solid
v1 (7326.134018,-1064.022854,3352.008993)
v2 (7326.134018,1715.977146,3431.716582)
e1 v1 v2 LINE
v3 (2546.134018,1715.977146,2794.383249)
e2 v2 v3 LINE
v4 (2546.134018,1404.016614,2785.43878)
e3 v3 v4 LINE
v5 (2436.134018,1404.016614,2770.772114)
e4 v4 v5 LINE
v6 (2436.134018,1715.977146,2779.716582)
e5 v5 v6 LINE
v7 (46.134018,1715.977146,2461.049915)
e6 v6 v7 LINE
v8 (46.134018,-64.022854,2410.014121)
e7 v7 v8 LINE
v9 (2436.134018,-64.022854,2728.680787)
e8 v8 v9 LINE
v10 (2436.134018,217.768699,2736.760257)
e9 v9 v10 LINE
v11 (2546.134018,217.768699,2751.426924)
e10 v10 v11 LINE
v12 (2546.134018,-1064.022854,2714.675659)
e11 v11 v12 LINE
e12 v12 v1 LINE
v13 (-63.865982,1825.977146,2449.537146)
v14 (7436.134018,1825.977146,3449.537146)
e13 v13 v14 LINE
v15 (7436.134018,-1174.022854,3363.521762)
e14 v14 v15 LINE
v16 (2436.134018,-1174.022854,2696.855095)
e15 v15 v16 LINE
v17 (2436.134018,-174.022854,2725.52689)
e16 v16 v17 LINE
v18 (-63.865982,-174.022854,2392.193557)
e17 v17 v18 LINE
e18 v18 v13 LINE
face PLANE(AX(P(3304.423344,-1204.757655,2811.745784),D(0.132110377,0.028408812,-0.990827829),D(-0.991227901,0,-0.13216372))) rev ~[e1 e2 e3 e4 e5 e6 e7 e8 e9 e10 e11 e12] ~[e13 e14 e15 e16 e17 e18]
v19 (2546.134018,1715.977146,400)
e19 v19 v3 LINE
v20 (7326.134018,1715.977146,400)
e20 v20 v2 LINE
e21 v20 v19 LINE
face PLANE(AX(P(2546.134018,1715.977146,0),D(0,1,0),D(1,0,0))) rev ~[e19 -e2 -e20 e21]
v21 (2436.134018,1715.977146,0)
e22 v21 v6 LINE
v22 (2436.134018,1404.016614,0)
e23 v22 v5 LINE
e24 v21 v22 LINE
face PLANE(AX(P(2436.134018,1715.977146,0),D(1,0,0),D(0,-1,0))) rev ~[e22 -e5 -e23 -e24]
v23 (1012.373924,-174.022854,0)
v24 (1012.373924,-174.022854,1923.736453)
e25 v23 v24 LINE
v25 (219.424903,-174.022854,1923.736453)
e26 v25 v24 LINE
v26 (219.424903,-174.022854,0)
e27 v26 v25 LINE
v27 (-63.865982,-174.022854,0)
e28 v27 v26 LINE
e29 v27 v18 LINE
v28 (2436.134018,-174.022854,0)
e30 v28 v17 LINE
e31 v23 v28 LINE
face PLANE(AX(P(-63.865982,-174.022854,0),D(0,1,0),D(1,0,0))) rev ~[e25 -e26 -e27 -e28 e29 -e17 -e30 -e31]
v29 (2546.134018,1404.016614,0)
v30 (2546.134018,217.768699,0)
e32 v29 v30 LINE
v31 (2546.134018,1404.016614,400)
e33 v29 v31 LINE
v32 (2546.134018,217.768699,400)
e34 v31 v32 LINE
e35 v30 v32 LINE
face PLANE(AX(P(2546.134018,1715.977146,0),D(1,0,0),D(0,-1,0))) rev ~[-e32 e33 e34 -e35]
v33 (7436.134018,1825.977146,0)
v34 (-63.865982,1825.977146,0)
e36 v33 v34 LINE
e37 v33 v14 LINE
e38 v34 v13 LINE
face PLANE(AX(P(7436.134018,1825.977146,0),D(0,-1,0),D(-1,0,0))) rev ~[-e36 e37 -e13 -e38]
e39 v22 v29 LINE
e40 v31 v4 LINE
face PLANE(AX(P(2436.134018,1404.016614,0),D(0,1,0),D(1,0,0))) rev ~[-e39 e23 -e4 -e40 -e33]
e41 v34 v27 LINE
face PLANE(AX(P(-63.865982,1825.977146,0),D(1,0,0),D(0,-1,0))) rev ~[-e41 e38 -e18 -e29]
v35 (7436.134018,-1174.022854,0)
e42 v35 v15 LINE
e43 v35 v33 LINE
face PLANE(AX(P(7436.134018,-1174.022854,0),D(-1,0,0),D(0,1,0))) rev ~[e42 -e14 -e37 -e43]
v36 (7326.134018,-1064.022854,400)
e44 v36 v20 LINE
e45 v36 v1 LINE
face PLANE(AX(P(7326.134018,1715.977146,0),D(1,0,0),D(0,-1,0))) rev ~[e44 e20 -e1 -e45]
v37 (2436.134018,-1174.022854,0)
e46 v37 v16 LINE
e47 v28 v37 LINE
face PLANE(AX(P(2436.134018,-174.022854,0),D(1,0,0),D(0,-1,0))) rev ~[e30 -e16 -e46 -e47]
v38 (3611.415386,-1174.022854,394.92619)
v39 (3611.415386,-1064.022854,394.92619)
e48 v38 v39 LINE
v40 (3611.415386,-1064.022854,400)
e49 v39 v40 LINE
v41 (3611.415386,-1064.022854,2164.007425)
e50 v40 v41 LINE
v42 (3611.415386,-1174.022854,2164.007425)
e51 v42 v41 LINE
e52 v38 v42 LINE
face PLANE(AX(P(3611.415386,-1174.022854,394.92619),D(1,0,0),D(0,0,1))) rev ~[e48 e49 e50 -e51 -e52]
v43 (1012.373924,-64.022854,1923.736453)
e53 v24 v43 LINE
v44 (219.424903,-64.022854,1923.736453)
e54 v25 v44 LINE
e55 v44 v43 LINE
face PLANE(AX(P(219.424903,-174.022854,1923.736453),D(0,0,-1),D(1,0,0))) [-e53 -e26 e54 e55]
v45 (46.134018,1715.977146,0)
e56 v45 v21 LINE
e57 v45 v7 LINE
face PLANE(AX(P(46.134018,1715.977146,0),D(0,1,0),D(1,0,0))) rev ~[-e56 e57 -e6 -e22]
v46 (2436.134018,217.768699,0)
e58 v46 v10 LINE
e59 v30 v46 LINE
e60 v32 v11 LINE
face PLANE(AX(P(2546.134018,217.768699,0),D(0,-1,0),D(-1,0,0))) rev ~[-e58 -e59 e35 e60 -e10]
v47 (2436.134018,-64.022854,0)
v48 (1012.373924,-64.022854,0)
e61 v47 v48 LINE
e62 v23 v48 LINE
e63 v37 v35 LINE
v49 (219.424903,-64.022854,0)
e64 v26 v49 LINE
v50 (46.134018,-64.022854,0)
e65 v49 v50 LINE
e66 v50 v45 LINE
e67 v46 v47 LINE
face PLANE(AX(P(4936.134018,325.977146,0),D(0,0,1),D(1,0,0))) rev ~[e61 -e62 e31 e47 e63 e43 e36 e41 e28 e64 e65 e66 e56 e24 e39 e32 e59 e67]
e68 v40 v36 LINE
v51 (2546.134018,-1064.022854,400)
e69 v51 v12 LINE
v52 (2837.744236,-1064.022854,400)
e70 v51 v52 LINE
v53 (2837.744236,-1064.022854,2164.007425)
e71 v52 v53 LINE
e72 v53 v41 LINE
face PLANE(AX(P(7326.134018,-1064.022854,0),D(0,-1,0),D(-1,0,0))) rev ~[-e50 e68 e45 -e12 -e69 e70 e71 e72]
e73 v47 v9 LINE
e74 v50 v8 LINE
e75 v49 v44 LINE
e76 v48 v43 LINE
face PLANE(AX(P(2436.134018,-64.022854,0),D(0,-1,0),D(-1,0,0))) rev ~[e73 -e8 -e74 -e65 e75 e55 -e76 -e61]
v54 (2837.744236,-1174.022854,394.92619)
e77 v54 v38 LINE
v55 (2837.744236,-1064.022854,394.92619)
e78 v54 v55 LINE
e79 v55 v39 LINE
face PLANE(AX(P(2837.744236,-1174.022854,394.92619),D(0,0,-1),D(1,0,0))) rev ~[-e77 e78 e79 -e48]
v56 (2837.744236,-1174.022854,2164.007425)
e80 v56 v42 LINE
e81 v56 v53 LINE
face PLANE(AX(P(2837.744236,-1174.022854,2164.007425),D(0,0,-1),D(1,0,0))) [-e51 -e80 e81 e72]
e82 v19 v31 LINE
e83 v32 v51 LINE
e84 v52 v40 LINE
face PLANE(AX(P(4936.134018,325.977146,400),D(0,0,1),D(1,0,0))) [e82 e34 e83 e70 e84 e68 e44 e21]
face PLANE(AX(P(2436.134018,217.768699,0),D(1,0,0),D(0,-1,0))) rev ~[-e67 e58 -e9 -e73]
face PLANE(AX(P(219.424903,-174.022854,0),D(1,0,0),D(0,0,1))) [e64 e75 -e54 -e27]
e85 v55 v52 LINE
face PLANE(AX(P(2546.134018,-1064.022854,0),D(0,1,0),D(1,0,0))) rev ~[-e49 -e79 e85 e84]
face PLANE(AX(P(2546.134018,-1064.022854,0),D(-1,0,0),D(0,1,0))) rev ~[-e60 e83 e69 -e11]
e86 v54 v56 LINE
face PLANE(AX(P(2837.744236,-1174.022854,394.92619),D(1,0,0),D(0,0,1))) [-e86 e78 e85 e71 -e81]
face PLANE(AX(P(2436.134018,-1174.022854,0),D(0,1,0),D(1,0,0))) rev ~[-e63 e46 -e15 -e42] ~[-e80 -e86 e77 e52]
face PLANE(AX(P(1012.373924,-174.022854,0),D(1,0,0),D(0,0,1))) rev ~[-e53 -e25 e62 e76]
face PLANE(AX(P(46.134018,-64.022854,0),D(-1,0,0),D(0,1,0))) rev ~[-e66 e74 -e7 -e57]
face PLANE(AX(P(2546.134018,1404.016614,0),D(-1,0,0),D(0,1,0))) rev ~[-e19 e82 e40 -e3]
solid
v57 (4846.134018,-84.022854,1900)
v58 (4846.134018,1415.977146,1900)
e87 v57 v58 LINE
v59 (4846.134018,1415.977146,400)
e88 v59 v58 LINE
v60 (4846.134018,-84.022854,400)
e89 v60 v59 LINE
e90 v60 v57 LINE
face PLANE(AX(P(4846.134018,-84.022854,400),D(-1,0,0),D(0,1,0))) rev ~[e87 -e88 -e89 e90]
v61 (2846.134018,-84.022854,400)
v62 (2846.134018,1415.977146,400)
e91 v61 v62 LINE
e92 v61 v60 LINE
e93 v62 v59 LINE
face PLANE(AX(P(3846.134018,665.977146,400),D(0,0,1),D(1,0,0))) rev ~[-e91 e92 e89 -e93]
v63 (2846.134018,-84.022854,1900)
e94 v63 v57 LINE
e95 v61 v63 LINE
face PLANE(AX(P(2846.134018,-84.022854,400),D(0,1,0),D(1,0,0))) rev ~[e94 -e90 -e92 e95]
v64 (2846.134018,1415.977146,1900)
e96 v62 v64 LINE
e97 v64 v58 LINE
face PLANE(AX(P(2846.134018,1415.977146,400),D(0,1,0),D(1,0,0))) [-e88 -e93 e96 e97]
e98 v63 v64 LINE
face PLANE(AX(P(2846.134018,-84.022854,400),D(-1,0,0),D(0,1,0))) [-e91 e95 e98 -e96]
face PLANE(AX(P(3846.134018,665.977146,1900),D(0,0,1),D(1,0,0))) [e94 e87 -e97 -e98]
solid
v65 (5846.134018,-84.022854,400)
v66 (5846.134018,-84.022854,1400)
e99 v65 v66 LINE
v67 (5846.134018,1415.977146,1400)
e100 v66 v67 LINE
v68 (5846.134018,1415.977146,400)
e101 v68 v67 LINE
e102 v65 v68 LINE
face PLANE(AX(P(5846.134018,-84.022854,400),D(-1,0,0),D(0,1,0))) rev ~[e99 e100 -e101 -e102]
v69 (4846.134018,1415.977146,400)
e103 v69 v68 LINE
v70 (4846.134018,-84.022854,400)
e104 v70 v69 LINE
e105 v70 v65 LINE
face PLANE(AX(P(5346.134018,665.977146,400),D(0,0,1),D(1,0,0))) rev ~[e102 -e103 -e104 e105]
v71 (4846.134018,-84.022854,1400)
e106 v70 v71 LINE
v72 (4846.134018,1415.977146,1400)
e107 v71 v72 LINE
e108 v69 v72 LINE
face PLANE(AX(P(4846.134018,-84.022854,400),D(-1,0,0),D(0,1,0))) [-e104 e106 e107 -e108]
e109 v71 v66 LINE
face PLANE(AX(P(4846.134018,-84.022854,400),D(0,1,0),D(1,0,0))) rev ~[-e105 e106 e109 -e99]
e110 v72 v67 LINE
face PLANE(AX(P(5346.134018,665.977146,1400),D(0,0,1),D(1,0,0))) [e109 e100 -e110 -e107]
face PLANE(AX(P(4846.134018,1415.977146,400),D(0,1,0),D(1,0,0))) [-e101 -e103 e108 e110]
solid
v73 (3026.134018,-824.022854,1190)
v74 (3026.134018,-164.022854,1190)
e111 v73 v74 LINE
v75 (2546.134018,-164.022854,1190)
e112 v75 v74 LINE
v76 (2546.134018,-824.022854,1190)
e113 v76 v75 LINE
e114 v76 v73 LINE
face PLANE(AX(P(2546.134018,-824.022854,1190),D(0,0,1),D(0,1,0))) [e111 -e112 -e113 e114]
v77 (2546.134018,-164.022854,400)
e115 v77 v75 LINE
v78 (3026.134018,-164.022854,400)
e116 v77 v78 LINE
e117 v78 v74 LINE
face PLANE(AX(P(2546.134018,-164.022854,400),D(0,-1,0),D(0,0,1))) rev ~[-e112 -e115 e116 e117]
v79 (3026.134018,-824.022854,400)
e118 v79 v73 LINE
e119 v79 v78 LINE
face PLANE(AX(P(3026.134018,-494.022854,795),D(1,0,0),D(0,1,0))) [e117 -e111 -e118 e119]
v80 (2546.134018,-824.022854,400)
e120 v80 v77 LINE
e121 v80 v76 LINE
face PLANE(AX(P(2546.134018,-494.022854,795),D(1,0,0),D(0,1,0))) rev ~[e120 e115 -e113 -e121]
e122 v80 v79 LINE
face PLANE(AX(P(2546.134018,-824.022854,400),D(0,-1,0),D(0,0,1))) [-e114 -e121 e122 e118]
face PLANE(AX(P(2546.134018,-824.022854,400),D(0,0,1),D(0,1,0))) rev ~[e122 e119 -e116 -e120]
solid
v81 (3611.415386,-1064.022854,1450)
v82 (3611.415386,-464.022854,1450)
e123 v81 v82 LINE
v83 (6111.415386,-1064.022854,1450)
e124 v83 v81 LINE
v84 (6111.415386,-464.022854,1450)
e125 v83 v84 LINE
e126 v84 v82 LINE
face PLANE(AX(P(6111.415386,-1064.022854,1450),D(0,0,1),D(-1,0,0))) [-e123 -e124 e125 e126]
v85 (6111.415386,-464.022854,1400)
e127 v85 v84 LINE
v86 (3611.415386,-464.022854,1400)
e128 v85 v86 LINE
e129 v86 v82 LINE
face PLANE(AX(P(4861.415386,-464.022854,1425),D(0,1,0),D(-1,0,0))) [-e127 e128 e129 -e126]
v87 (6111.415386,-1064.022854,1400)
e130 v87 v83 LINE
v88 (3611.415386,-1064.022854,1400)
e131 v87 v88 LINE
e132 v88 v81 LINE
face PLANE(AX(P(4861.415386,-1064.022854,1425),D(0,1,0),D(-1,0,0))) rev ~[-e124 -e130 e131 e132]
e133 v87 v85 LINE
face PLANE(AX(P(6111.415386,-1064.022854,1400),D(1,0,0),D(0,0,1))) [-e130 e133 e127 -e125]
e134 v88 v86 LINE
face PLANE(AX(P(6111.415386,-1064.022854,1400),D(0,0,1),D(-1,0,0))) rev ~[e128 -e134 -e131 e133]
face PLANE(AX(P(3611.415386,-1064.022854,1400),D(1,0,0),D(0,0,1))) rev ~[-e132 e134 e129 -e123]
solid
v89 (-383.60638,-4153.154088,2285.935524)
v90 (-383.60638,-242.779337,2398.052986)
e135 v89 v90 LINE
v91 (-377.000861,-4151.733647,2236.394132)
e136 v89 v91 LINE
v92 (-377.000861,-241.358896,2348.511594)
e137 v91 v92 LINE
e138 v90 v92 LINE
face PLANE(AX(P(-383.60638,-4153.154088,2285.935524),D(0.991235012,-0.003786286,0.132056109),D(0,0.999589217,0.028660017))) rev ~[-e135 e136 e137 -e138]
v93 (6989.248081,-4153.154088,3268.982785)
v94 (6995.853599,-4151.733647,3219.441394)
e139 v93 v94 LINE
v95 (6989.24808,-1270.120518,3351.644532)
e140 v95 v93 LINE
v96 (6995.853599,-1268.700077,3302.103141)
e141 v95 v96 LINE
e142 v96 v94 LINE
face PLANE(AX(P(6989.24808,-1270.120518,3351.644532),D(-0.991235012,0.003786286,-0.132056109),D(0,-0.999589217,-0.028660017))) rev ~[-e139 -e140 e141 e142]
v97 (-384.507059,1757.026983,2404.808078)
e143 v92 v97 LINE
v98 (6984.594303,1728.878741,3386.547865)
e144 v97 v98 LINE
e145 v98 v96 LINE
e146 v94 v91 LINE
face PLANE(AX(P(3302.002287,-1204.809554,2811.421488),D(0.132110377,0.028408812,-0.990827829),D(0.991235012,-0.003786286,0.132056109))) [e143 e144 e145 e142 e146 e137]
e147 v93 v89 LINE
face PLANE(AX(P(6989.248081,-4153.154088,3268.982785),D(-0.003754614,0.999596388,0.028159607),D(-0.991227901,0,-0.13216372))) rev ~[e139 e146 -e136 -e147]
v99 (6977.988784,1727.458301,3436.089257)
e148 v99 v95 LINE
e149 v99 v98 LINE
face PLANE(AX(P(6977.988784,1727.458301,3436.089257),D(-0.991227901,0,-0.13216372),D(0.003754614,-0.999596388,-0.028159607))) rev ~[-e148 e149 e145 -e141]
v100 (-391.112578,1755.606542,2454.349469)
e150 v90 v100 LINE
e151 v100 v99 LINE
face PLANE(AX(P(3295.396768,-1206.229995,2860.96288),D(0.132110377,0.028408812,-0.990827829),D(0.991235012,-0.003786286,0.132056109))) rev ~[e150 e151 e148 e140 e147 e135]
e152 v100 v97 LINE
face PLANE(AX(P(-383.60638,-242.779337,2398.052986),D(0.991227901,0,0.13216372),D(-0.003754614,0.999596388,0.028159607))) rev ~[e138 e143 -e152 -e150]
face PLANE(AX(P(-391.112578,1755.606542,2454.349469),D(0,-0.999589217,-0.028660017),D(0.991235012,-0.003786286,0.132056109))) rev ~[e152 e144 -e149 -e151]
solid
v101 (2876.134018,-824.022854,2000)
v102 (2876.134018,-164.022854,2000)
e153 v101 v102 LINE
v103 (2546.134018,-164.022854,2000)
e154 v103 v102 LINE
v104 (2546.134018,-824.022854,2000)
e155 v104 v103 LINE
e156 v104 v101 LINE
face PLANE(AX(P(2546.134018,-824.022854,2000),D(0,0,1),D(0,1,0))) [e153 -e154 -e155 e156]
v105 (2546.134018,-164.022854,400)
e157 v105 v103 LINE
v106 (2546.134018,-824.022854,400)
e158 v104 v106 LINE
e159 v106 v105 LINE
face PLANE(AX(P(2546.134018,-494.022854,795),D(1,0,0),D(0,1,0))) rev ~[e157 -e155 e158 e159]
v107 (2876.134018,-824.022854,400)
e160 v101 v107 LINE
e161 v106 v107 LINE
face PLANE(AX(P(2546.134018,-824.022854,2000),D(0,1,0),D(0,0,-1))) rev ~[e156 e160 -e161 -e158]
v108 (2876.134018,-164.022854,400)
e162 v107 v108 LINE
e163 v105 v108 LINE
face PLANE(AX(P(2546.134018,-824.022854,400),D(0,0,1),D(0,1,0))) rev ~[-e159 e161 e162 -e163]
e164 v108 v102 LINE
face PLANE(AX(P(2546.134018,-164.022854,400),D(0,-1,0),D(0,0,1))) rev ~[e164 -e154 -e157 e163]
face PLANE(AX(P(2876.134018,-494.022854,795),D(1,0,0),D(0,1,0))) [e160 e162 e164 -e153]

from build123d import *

# Parameters (mm, degrees)
F7_DEPTH  = 50
F8_REACH  = 9267.0421515008
F9_W      = 792.9490208626
F9_H      = 1923.7364530563
F10_DEPTH = 110
F11_W     = 773.6711502075
F11_H     = 1769.0812349319
F12_DEPTH = 110
F13_DEPTH = 400
F14_W     = 660
F14_H     = 790
F15_DEPTH = 480
F14_H_2   = 810
F16_DEPTH = 330
F17_W     = 2000
F17_H     = 1500
F18_DEPTH = 1500
F17_W_2   = 1000
F19_DEPTH = 1000
F20_W     = 2500
F20_H     = 50
F21_DEPTH = 600


# Not quite as in the source:
# - a feature names something its author has since deleted; it is built from what else it names


with BuildPart() as f7:
    # F6 (on 3pt) → F7 (new body)
    with BuildSketch(Plane(origin=(-321.5081857629, -69.1366251757, 2411.3113932214), x_dir=(0.9912350116, -0.0037862856, 0.1320561086), z_dir=(0.1321103773, 0.0284088121, -0.9908278295))):
        Polygon((-62.647297173, 173.9513684009), (-70.2198684375, -1825.2270662935), (2407.8676605606, -1825.2270662935), (7364.0427185569, -1825.2270662935), (7375.4015754536, 1173.5405857481), (7375.4015754536, 4057.758942678), (-62.647297173, 4085.9330937089), align=None)
    extrude(amount=F7_DEPTH)


with BuildPart() as f8:
    f8_end = Plane(origin=(3304.4233440469, -1204.757655027, 2811.745783625), x_dir=(-0.9912279007, 0, -0.1321637201), z_dir=(0.1321103773, 0.0284088121, -0.9908278295))
    # F0 (on Top) → F8 (new body, up to a plane its end follows)
    with BuildSketch(Plane.XY):
        Polygon((7436.1340180039, 1825.9771460295), (2436.1340180039, 1825.9771460295), (2436.1340180039, 1715.9771460295), (2436.1340180039, 1404.0166139603), (2546.1340180039, 1404.0166139603), (2546.1340180039, 1715.9771460295), (7326.1340180039, 1715.9771460295), (7326.1340180039, -1064.0228539705), (2546.1340180039, -1064.0228539705), (2546.1340180039, 217.7686989307), (2436.1340180039, 217.7686989307), (2436.1340180039, -64.0228539705), (2436.1340180039, -174.0228539705), (2436.1340180039, -1174.0228539705), (7436.1340180039, -1174.0228539705), align=None)
        Polygon((2436.1340180039, 1825.9771460295), (-63.8659819961, 1825.9771460295), (-63.8659819961, -174.0228539705), (2436.1340180039, -174.0228539705), (2436.1340180039, -64.0228539705), (46.1340180039, -64.0228539705), (46.1340180039, 1715.9771460295), (2436.1340180039, 1715.9771460295), align=None)
    f8_long = extrude(amount=F8_REACH, mode=Mode.PRIVATE)
    add(split(f8_long, bisect_by=f8_end, keep=Keep.TOP, mode=Mode.PRIVATE))

    # F9 (on face) → F10 (cut, through all)
    with BuildSketch(Plane.XZ.offset(174.0228539705)):
        with Locations((615.8994138241, 961.8682265282)):
            Rectangle(F9_W, F9_H)
    extrude(amount=-F10_DEPTH, mode=Mode.SUBTRACT)

    # F11 (on face) → F12 (cut, through all)
    with BuildSketch(Plane.XZ.offset(1174.0228539705)):
        with Locations((3224.5798110962, 1279.4668078423)):
            Rectangle(F11_W, F11_H)
    extrude(amount=-F12_DEPTH, mode=Mode.SUBTRACT)

    # F0 (on Top) → F13 (join)
    with BuildSketch(Plane.XY):
        Polygon((2546.1340180039, 1715.9771460295), (2546.1340180039, 1404.0166139603), (2546.1340180039, 217.7686989307), (2546.1340180039, -1064.0228539705), (7326.1340180039, -1064.0228539705), (7326.1340180039, 1715.9771460295), align=None)
    extrude(amount=F13_DEPTH)


with BuildPart() as f15:
    # F14 (on face) → F15 (new body)
    with BuildSketch(Plane.YZ.offset(2546.1340180039)):
        with Locations((-494.0228539705, 795)):
            Rectangle(F14_W, F14_H)
    extrude(amount=F15_DEPTH)


with BuildPart() as f16:
    # F14 (on face) → F16 (new body)
    with BuildSketch(Plane.YZ.offset(2546.1340180039)):
        with Locations((-494.0228539705, 795)):
            Rectangle(F14_W, F14_H)
        with Locations((-494.0228539705, 1595)):
            Rectangle(F14_W, F14_H_2)
    extrude(amount=F16_DEPTH)


with BuildPart() as f18:
    # F17 (on face) → F18 (new body)
    with BuildSketch(Plane.XY.offset(400)):
        with Locations((3846.1340180039, 665.9771460295)):
            Rectangle(F17_W, F17_H)
    extrude(amount=F18_DEPTH)


with BuildPart() as f19:
    # F17 (on face) → F19 (new body)
    with BuildSketch(Plane.XY.offset(400)):
        with Locations((5346.1340180039, 665.9771460295)):
            Rectangle(F17_W_2, F17_H)
    extrude(amount=F19_DEPTH)


with BuildPart() as f21:
    # F20 (on face) → F21 (new body)
    with BuildSketch(Plane(origin=(0, -1064.0228539705, 0), x_dir=(-1, 0, 0), z_dir=(0, 1, 0))):
        with Locations((-4861.4153862, 1425)):
            Rectangle(F20_W, F20_H)
    extrude(amount=F21_DEPTH)


solid = Compound([f7.part, f8.part, f15.part, f16.part, f18.part, f19.part, f21.part])
